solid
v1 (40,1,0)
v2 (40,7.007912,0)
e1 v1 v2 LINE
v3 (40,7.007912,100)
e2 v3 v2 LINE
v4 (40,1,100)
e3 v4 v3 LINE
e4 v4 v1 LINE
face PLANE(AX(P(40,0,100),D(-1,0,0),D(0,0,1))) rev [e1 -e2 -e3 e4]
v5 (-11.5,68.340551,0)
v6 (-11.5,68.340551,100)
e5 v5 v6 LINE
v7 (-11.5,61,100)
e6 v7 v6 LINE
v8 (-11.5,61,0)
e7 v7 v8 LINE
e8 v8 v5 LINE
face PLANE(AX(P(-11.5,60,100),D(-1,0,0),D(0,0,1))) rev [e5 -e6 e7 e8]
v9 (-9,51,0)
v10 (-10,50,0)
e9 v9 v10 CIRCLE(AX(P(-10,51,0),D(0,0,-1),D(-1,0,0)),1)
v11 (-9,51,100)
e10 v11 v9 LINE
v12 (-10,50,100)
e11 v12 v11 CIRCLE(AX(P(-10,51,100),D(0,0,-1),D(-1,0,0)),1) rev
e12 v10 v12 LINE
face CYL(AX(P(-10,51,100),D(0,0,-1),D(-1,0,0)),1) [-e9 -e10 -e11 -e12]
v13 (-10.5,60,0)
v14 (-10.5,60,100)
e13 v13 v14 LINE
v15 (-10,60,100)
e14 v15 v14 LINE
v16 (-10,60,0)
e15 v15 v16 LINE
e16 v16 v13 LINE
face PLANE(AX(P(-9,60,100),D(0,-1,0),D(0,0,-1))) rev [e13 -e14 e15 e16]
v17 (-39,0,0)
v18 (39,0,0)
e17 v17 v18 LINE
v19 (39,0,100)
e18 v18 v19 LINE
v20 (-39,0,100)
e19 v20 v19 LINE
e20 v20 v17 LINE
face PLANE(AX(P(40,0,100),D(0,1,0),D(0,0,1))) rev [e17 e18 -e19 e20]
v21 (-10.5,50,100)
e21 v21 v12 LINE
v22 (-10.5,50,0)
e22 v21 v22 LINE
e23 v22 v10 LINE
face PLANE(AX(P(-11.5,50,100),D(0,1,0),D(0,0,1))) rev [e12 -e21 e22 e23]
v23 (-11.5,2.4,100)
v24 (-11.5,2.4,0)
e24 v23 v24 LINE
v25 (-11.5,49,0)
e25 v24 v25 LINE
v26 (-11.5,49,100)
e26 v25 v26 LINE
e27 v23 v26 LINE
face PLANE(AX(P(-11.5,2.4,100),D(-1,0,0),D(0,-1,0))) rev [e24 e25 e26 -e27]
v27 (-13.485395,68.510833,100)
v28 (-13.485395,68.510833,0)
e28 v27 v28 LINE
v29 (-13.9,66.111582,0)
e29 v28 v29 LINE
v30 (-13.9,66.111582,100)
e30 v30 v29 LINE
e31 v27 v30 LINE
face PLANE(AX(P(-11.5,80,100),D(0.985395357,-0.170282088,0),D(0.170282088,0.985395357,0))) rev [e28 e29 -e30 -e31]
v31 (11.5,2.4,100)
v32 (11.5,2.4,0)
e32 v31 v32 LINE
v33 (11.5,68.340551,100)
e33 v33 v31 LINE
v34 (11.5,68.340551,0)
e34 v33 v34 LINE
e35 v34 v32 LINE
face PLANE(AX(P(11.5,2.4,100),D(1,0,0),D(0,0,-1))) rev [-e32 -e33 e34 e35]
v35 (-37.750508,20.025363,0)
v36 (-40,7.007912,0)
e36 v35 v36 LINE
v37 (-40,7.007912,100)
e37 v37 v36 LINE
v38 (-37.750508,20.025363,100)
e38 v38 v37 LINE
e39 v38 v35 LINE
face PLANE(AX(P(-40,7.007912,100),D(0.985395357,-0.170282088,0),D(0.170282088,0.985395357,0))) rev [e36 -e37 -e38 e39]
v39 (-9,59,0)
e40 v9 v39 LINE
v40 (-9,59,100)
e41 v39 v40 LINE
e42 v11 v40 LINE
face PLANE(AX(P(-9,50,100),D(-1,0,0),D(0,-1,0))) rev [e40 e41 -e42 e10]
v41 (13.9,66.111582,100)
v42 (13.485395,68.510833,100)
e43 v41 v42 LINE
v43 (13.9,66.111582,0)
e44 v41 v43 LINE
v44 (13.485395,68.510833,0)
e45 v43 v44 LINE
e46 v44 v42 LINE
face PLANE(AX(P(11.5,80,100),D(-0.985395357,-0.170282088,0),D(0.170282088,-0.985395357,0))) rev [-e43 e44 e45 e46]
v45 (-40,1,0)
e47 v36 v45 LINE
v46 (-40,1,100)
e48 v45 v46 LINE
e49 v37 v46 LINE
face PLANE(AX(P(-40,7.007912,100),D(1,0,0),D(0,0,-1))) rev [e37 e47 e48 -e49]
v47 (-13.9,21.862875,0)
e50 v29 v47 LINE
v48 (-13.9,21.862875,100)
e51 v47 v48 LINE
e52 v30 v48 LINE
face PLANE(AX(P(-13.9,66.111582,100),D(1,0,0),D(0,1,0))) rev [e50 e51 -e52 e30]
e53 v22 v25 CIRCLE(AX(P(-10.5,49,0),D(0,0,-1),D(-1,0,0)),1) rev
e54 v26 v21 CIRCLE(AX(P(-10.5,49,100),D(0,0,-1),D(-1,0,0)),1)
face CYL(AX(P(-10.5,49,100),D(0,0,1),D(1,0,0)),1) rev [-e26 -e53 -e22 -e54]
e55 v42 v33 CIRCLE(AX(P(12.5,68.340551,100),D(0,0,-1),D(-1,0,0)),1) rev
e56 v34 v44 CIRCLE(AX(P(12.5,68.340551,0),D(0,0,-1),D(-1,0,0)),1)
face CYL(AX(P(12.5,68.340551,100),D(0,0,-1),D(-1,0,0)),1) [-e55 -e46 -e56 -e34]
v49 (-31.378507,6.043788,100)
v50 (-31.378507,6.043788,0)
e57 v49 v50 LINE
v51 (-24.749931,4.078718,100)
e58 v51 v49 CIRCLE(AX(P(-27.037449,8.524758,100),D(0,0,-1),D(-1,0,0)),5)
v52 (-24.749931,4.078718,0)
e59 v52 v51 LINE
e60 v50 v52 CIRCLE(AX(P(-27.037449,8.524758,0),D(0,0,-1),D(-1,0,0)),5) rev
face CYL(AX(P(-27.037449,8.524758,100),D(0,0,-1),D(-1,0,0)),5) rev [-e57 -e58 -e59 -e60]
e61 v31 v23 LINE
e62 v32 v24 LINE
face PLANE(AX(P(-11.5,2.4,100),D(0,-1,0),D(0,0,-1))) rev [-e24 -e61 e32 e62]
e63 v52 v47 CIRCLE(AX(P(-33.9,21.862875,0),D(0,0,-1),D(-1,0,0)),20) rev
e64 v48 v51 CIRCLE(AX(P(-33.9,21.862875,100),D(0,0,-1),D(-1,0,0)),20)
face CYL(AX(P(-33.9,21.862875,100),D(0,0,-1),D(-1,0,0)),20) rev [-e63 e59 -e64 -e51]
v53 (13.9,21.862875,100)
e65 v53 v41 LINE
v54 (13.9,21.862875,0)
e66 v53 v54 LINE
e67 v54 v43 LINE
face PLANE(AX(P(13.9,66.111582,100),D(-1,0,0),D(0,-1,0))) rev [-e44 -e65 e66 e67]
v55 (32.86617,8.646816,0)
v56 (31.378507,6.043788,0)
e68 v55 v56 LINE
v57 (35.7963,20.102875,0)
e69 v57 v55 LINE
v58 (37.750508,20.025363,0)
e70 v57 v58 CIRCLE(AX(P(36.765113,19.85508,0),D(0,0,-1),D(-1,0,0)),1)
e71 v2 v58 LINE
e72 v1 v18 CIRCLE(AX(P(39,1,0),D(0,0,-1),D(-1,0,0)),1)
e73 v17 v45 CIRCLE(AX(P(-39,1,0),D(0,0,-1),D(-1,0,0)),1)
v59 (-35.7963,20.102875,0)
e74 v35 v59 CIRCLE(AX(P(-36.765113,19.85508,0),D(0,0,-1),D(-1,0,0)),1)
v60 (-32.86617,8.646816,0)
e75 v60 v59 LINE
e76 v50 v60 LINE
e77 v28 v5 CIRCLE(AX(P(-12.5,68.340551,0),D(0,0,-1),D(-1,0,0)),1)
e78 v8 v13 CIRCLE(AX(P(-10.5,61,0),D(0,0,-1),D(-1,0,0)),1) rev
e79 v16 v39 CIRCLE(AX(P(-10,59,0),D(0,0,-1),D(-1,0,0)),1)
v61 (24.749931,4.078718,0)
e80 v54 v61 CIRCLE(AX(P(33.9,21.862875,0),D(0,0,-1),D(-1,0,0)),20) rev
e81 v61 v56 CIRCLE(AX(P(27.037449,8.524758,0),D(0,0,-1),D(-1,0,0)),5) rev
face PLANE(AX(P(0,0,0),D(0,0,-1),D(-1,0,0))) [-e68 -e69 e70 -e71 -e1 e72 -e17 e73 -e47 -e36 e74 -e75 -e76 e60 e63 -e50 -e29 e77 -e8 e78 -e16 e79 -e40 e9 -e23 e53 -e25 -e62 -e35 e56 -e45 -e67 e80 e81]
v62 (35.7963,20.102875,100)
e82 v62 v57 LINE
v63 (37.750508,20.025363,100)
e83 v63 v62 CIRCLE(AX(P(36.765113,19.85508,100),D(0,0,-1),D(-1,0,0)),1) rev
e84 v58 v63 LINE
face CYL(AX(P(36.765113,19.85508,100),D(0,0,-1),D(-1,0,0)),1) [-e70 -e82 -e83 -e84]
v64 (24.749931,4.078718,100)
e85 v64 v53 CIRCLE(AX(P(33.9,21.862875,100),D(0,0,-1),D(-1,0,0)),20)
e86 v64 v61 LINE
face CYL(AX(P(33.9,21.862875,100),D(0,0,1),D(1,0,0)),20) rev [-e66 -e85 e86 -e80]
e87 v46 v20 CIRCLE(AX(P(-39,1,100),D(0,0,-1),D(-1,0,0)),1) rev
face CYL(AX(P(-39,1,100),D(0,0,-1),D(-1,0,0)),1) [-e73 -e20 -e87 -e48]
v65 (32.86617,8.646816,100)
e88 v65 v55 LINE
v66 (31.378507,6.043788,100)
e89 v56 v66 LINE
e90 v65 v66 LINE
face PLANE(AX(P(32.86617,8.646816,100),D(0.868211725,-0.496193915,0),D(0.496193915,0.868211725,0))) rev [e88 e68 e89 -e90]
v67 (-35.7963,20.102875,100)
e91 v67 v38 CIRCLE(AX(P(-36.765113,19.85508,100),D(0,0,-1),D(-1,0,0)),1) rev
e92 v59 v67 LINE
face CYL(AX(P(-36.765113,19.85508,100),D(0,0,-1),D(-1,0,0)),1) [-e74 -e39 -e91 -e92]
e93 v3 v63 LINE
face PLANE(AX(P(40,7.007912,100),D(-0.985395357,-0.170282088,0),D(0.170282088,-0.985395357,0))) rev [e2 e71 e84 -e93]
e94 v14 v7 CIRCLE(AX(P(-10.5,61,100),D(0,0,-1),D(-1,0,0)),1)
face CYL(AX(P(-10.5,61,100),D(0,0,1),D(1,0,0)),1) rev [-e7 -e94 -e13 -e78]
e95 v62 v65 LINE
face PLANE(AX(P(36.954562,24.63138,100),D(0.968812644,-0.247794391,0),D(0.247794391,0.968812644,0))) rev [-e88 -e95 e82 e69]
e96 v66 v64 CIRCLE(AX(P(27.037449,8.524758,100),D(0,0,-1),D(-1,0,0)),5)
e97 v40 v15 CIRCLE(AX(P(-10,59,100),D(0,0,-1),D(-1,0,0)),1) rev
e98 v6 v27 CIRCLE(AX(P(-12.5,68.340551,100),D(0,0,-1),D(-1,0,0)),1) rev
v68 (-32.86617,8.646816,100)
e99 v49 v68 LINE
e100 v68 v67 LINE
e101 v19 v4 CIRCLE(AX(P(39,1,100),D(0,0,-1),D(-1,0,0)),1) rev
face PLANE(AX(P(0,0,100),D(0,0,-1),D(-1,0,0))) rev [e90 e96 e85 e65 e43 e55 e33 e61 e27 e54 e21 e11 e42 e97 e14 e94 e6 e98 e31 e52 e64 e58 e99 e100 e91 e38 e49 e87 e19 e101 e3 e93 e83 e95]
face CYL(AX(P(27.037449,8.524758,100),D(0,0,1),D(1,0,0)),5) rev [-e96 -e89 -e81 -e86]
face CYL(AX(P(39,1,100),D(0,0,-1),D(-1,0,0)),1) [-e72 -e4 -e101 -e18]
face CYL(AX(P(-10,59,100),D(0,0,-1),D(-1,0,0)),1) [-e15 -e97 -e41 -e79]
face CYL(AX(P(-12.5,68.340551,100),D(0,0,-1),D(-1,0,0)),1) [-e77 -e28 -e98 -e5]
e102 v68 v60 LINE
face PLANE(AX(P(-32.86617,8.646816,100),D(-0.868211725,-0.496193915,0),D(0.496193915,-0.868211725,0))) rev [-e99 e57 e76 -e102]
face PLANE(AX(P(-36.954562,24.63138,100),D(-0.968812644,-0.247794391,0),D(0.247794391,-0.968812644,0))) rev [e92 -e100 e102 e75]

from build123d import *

# Parameters (mm, degrees)
BOSS_EXTRU_1_DEPTH = 100
CONG_2_R           = 1
CONGES_BASE_R      = 20
CONG_4_R           = 1
CONG_5_R           = 5


with BuildPart() as part:
    # Esquisse1 → Boss.-Extru.1 (new body)
    with BuildSketch(Plane.XY):
        Polygon((-11.5, 2.4), (11.5, 2.4), (11.5, 80), (13.9, 66.111581736), (13.9, 2.4), (29.296036477, 2.4), (32.866170168, 8.646815683), (36.954561628, 24.631379819), (40, 7.007912357), (40, 0), (-40, 0), (-40, 7.007912357), (-36.954561628, 24.631379819), (-32.866170168, 8.646815683), (-29.296036477, 2.4), (-13.9, 2.4), (-13.9, 66.111581736), (-11.5, 80), (-11.5, 60), (-9, 60), (-9, 50), (-11.5, 50), align=None)
    extrude(amount=BOSS_EXTRU_1_DEPTH)

    # Congé2
    cong_2_edges = [part.edges().sort_by_distance(p)[0] for p in [
        (-11.5, 60, 50),
        (-9, 60, 50),
        (-9, 50, 50),
        (-11.5, 50, 50),
    ]]
    fillet(cong_2_edges, radius=CONG_2_R)

    # Conges_base
    # the kernel refuses this fillet: 20 mm, written as the material it adds along each edge
    with BuildSketch(Plane(origin=(13.9, 2.4, 0), x_dir=(0, 1, 0), z_dir=(0, 0, 1))) as conges_base_piece_1:
        with BuildLine():
            CenterArc((19.462875427, -20), CONGES_BASE_R, 90, 76.691260518)
            Line((0, -15.396036477), (-0.389257509, -15.303957207))
            ThreePointArc((-0.389257509, -15.303957207), (-0.4, -7.698018239), (-0.4, 0))
            Line((-0.4, 0), (0, 0.4))
            Line((0, 0.4), (19.462875427, 0.4))
            Line((19.462875427, 0.4), (19.462875427, 0))
        make_face()
    extrude(amount=100)
    with BuildSketch(Plane(origin=(-13.9, 2.4, 0), x_dir=(0, 1, 0), z_dir=(0, 0, 1))) as conges_base_piece_2:
        with BuildLine():
            CenterArc((19.462875427, 20), CONGES_BASE_R, 193.308739482, 76.691260518)
            Line((0, 15.396036477), (-0.389257509, 15.303957207))
            ThreePointArc((-0.389257509, 15.303957207), (-0.4, 7.698018239), (-0.4, 0))
            Line((-0.4, 0), (0, -0.4))
            Line((0, -0.4), (19.462875427, -0.4))
            Line((19.462875427, -0.4), (19.462875427, 0))
        make_face()
    extrude(amount=100)

    # Congé4
    cong_4_edges = [part.edges().sort_by_distance(p)[0] for p in [
        (11.5, 80, 50),
        (36.954561628, 24.631379819, 50),
        (40, 0, 50),
        (-40, 0, 50),
        (-36.954561628, 24.631379819, 50),
        (-11.5, 80, 50),
    ]]
    fillet(cong_4_edges, radius=CONG_4_R)

    # Congé5
    cong_5_edges = [part.edges().sort_by_distance(p)[0] for p in [
        (29.296036477, 2.4, 50),
        (-29.296036477, 2.4, 50),
    ]]
    fillet(cong_5_edges, radius=CONG_5_R)


solid = part.part
